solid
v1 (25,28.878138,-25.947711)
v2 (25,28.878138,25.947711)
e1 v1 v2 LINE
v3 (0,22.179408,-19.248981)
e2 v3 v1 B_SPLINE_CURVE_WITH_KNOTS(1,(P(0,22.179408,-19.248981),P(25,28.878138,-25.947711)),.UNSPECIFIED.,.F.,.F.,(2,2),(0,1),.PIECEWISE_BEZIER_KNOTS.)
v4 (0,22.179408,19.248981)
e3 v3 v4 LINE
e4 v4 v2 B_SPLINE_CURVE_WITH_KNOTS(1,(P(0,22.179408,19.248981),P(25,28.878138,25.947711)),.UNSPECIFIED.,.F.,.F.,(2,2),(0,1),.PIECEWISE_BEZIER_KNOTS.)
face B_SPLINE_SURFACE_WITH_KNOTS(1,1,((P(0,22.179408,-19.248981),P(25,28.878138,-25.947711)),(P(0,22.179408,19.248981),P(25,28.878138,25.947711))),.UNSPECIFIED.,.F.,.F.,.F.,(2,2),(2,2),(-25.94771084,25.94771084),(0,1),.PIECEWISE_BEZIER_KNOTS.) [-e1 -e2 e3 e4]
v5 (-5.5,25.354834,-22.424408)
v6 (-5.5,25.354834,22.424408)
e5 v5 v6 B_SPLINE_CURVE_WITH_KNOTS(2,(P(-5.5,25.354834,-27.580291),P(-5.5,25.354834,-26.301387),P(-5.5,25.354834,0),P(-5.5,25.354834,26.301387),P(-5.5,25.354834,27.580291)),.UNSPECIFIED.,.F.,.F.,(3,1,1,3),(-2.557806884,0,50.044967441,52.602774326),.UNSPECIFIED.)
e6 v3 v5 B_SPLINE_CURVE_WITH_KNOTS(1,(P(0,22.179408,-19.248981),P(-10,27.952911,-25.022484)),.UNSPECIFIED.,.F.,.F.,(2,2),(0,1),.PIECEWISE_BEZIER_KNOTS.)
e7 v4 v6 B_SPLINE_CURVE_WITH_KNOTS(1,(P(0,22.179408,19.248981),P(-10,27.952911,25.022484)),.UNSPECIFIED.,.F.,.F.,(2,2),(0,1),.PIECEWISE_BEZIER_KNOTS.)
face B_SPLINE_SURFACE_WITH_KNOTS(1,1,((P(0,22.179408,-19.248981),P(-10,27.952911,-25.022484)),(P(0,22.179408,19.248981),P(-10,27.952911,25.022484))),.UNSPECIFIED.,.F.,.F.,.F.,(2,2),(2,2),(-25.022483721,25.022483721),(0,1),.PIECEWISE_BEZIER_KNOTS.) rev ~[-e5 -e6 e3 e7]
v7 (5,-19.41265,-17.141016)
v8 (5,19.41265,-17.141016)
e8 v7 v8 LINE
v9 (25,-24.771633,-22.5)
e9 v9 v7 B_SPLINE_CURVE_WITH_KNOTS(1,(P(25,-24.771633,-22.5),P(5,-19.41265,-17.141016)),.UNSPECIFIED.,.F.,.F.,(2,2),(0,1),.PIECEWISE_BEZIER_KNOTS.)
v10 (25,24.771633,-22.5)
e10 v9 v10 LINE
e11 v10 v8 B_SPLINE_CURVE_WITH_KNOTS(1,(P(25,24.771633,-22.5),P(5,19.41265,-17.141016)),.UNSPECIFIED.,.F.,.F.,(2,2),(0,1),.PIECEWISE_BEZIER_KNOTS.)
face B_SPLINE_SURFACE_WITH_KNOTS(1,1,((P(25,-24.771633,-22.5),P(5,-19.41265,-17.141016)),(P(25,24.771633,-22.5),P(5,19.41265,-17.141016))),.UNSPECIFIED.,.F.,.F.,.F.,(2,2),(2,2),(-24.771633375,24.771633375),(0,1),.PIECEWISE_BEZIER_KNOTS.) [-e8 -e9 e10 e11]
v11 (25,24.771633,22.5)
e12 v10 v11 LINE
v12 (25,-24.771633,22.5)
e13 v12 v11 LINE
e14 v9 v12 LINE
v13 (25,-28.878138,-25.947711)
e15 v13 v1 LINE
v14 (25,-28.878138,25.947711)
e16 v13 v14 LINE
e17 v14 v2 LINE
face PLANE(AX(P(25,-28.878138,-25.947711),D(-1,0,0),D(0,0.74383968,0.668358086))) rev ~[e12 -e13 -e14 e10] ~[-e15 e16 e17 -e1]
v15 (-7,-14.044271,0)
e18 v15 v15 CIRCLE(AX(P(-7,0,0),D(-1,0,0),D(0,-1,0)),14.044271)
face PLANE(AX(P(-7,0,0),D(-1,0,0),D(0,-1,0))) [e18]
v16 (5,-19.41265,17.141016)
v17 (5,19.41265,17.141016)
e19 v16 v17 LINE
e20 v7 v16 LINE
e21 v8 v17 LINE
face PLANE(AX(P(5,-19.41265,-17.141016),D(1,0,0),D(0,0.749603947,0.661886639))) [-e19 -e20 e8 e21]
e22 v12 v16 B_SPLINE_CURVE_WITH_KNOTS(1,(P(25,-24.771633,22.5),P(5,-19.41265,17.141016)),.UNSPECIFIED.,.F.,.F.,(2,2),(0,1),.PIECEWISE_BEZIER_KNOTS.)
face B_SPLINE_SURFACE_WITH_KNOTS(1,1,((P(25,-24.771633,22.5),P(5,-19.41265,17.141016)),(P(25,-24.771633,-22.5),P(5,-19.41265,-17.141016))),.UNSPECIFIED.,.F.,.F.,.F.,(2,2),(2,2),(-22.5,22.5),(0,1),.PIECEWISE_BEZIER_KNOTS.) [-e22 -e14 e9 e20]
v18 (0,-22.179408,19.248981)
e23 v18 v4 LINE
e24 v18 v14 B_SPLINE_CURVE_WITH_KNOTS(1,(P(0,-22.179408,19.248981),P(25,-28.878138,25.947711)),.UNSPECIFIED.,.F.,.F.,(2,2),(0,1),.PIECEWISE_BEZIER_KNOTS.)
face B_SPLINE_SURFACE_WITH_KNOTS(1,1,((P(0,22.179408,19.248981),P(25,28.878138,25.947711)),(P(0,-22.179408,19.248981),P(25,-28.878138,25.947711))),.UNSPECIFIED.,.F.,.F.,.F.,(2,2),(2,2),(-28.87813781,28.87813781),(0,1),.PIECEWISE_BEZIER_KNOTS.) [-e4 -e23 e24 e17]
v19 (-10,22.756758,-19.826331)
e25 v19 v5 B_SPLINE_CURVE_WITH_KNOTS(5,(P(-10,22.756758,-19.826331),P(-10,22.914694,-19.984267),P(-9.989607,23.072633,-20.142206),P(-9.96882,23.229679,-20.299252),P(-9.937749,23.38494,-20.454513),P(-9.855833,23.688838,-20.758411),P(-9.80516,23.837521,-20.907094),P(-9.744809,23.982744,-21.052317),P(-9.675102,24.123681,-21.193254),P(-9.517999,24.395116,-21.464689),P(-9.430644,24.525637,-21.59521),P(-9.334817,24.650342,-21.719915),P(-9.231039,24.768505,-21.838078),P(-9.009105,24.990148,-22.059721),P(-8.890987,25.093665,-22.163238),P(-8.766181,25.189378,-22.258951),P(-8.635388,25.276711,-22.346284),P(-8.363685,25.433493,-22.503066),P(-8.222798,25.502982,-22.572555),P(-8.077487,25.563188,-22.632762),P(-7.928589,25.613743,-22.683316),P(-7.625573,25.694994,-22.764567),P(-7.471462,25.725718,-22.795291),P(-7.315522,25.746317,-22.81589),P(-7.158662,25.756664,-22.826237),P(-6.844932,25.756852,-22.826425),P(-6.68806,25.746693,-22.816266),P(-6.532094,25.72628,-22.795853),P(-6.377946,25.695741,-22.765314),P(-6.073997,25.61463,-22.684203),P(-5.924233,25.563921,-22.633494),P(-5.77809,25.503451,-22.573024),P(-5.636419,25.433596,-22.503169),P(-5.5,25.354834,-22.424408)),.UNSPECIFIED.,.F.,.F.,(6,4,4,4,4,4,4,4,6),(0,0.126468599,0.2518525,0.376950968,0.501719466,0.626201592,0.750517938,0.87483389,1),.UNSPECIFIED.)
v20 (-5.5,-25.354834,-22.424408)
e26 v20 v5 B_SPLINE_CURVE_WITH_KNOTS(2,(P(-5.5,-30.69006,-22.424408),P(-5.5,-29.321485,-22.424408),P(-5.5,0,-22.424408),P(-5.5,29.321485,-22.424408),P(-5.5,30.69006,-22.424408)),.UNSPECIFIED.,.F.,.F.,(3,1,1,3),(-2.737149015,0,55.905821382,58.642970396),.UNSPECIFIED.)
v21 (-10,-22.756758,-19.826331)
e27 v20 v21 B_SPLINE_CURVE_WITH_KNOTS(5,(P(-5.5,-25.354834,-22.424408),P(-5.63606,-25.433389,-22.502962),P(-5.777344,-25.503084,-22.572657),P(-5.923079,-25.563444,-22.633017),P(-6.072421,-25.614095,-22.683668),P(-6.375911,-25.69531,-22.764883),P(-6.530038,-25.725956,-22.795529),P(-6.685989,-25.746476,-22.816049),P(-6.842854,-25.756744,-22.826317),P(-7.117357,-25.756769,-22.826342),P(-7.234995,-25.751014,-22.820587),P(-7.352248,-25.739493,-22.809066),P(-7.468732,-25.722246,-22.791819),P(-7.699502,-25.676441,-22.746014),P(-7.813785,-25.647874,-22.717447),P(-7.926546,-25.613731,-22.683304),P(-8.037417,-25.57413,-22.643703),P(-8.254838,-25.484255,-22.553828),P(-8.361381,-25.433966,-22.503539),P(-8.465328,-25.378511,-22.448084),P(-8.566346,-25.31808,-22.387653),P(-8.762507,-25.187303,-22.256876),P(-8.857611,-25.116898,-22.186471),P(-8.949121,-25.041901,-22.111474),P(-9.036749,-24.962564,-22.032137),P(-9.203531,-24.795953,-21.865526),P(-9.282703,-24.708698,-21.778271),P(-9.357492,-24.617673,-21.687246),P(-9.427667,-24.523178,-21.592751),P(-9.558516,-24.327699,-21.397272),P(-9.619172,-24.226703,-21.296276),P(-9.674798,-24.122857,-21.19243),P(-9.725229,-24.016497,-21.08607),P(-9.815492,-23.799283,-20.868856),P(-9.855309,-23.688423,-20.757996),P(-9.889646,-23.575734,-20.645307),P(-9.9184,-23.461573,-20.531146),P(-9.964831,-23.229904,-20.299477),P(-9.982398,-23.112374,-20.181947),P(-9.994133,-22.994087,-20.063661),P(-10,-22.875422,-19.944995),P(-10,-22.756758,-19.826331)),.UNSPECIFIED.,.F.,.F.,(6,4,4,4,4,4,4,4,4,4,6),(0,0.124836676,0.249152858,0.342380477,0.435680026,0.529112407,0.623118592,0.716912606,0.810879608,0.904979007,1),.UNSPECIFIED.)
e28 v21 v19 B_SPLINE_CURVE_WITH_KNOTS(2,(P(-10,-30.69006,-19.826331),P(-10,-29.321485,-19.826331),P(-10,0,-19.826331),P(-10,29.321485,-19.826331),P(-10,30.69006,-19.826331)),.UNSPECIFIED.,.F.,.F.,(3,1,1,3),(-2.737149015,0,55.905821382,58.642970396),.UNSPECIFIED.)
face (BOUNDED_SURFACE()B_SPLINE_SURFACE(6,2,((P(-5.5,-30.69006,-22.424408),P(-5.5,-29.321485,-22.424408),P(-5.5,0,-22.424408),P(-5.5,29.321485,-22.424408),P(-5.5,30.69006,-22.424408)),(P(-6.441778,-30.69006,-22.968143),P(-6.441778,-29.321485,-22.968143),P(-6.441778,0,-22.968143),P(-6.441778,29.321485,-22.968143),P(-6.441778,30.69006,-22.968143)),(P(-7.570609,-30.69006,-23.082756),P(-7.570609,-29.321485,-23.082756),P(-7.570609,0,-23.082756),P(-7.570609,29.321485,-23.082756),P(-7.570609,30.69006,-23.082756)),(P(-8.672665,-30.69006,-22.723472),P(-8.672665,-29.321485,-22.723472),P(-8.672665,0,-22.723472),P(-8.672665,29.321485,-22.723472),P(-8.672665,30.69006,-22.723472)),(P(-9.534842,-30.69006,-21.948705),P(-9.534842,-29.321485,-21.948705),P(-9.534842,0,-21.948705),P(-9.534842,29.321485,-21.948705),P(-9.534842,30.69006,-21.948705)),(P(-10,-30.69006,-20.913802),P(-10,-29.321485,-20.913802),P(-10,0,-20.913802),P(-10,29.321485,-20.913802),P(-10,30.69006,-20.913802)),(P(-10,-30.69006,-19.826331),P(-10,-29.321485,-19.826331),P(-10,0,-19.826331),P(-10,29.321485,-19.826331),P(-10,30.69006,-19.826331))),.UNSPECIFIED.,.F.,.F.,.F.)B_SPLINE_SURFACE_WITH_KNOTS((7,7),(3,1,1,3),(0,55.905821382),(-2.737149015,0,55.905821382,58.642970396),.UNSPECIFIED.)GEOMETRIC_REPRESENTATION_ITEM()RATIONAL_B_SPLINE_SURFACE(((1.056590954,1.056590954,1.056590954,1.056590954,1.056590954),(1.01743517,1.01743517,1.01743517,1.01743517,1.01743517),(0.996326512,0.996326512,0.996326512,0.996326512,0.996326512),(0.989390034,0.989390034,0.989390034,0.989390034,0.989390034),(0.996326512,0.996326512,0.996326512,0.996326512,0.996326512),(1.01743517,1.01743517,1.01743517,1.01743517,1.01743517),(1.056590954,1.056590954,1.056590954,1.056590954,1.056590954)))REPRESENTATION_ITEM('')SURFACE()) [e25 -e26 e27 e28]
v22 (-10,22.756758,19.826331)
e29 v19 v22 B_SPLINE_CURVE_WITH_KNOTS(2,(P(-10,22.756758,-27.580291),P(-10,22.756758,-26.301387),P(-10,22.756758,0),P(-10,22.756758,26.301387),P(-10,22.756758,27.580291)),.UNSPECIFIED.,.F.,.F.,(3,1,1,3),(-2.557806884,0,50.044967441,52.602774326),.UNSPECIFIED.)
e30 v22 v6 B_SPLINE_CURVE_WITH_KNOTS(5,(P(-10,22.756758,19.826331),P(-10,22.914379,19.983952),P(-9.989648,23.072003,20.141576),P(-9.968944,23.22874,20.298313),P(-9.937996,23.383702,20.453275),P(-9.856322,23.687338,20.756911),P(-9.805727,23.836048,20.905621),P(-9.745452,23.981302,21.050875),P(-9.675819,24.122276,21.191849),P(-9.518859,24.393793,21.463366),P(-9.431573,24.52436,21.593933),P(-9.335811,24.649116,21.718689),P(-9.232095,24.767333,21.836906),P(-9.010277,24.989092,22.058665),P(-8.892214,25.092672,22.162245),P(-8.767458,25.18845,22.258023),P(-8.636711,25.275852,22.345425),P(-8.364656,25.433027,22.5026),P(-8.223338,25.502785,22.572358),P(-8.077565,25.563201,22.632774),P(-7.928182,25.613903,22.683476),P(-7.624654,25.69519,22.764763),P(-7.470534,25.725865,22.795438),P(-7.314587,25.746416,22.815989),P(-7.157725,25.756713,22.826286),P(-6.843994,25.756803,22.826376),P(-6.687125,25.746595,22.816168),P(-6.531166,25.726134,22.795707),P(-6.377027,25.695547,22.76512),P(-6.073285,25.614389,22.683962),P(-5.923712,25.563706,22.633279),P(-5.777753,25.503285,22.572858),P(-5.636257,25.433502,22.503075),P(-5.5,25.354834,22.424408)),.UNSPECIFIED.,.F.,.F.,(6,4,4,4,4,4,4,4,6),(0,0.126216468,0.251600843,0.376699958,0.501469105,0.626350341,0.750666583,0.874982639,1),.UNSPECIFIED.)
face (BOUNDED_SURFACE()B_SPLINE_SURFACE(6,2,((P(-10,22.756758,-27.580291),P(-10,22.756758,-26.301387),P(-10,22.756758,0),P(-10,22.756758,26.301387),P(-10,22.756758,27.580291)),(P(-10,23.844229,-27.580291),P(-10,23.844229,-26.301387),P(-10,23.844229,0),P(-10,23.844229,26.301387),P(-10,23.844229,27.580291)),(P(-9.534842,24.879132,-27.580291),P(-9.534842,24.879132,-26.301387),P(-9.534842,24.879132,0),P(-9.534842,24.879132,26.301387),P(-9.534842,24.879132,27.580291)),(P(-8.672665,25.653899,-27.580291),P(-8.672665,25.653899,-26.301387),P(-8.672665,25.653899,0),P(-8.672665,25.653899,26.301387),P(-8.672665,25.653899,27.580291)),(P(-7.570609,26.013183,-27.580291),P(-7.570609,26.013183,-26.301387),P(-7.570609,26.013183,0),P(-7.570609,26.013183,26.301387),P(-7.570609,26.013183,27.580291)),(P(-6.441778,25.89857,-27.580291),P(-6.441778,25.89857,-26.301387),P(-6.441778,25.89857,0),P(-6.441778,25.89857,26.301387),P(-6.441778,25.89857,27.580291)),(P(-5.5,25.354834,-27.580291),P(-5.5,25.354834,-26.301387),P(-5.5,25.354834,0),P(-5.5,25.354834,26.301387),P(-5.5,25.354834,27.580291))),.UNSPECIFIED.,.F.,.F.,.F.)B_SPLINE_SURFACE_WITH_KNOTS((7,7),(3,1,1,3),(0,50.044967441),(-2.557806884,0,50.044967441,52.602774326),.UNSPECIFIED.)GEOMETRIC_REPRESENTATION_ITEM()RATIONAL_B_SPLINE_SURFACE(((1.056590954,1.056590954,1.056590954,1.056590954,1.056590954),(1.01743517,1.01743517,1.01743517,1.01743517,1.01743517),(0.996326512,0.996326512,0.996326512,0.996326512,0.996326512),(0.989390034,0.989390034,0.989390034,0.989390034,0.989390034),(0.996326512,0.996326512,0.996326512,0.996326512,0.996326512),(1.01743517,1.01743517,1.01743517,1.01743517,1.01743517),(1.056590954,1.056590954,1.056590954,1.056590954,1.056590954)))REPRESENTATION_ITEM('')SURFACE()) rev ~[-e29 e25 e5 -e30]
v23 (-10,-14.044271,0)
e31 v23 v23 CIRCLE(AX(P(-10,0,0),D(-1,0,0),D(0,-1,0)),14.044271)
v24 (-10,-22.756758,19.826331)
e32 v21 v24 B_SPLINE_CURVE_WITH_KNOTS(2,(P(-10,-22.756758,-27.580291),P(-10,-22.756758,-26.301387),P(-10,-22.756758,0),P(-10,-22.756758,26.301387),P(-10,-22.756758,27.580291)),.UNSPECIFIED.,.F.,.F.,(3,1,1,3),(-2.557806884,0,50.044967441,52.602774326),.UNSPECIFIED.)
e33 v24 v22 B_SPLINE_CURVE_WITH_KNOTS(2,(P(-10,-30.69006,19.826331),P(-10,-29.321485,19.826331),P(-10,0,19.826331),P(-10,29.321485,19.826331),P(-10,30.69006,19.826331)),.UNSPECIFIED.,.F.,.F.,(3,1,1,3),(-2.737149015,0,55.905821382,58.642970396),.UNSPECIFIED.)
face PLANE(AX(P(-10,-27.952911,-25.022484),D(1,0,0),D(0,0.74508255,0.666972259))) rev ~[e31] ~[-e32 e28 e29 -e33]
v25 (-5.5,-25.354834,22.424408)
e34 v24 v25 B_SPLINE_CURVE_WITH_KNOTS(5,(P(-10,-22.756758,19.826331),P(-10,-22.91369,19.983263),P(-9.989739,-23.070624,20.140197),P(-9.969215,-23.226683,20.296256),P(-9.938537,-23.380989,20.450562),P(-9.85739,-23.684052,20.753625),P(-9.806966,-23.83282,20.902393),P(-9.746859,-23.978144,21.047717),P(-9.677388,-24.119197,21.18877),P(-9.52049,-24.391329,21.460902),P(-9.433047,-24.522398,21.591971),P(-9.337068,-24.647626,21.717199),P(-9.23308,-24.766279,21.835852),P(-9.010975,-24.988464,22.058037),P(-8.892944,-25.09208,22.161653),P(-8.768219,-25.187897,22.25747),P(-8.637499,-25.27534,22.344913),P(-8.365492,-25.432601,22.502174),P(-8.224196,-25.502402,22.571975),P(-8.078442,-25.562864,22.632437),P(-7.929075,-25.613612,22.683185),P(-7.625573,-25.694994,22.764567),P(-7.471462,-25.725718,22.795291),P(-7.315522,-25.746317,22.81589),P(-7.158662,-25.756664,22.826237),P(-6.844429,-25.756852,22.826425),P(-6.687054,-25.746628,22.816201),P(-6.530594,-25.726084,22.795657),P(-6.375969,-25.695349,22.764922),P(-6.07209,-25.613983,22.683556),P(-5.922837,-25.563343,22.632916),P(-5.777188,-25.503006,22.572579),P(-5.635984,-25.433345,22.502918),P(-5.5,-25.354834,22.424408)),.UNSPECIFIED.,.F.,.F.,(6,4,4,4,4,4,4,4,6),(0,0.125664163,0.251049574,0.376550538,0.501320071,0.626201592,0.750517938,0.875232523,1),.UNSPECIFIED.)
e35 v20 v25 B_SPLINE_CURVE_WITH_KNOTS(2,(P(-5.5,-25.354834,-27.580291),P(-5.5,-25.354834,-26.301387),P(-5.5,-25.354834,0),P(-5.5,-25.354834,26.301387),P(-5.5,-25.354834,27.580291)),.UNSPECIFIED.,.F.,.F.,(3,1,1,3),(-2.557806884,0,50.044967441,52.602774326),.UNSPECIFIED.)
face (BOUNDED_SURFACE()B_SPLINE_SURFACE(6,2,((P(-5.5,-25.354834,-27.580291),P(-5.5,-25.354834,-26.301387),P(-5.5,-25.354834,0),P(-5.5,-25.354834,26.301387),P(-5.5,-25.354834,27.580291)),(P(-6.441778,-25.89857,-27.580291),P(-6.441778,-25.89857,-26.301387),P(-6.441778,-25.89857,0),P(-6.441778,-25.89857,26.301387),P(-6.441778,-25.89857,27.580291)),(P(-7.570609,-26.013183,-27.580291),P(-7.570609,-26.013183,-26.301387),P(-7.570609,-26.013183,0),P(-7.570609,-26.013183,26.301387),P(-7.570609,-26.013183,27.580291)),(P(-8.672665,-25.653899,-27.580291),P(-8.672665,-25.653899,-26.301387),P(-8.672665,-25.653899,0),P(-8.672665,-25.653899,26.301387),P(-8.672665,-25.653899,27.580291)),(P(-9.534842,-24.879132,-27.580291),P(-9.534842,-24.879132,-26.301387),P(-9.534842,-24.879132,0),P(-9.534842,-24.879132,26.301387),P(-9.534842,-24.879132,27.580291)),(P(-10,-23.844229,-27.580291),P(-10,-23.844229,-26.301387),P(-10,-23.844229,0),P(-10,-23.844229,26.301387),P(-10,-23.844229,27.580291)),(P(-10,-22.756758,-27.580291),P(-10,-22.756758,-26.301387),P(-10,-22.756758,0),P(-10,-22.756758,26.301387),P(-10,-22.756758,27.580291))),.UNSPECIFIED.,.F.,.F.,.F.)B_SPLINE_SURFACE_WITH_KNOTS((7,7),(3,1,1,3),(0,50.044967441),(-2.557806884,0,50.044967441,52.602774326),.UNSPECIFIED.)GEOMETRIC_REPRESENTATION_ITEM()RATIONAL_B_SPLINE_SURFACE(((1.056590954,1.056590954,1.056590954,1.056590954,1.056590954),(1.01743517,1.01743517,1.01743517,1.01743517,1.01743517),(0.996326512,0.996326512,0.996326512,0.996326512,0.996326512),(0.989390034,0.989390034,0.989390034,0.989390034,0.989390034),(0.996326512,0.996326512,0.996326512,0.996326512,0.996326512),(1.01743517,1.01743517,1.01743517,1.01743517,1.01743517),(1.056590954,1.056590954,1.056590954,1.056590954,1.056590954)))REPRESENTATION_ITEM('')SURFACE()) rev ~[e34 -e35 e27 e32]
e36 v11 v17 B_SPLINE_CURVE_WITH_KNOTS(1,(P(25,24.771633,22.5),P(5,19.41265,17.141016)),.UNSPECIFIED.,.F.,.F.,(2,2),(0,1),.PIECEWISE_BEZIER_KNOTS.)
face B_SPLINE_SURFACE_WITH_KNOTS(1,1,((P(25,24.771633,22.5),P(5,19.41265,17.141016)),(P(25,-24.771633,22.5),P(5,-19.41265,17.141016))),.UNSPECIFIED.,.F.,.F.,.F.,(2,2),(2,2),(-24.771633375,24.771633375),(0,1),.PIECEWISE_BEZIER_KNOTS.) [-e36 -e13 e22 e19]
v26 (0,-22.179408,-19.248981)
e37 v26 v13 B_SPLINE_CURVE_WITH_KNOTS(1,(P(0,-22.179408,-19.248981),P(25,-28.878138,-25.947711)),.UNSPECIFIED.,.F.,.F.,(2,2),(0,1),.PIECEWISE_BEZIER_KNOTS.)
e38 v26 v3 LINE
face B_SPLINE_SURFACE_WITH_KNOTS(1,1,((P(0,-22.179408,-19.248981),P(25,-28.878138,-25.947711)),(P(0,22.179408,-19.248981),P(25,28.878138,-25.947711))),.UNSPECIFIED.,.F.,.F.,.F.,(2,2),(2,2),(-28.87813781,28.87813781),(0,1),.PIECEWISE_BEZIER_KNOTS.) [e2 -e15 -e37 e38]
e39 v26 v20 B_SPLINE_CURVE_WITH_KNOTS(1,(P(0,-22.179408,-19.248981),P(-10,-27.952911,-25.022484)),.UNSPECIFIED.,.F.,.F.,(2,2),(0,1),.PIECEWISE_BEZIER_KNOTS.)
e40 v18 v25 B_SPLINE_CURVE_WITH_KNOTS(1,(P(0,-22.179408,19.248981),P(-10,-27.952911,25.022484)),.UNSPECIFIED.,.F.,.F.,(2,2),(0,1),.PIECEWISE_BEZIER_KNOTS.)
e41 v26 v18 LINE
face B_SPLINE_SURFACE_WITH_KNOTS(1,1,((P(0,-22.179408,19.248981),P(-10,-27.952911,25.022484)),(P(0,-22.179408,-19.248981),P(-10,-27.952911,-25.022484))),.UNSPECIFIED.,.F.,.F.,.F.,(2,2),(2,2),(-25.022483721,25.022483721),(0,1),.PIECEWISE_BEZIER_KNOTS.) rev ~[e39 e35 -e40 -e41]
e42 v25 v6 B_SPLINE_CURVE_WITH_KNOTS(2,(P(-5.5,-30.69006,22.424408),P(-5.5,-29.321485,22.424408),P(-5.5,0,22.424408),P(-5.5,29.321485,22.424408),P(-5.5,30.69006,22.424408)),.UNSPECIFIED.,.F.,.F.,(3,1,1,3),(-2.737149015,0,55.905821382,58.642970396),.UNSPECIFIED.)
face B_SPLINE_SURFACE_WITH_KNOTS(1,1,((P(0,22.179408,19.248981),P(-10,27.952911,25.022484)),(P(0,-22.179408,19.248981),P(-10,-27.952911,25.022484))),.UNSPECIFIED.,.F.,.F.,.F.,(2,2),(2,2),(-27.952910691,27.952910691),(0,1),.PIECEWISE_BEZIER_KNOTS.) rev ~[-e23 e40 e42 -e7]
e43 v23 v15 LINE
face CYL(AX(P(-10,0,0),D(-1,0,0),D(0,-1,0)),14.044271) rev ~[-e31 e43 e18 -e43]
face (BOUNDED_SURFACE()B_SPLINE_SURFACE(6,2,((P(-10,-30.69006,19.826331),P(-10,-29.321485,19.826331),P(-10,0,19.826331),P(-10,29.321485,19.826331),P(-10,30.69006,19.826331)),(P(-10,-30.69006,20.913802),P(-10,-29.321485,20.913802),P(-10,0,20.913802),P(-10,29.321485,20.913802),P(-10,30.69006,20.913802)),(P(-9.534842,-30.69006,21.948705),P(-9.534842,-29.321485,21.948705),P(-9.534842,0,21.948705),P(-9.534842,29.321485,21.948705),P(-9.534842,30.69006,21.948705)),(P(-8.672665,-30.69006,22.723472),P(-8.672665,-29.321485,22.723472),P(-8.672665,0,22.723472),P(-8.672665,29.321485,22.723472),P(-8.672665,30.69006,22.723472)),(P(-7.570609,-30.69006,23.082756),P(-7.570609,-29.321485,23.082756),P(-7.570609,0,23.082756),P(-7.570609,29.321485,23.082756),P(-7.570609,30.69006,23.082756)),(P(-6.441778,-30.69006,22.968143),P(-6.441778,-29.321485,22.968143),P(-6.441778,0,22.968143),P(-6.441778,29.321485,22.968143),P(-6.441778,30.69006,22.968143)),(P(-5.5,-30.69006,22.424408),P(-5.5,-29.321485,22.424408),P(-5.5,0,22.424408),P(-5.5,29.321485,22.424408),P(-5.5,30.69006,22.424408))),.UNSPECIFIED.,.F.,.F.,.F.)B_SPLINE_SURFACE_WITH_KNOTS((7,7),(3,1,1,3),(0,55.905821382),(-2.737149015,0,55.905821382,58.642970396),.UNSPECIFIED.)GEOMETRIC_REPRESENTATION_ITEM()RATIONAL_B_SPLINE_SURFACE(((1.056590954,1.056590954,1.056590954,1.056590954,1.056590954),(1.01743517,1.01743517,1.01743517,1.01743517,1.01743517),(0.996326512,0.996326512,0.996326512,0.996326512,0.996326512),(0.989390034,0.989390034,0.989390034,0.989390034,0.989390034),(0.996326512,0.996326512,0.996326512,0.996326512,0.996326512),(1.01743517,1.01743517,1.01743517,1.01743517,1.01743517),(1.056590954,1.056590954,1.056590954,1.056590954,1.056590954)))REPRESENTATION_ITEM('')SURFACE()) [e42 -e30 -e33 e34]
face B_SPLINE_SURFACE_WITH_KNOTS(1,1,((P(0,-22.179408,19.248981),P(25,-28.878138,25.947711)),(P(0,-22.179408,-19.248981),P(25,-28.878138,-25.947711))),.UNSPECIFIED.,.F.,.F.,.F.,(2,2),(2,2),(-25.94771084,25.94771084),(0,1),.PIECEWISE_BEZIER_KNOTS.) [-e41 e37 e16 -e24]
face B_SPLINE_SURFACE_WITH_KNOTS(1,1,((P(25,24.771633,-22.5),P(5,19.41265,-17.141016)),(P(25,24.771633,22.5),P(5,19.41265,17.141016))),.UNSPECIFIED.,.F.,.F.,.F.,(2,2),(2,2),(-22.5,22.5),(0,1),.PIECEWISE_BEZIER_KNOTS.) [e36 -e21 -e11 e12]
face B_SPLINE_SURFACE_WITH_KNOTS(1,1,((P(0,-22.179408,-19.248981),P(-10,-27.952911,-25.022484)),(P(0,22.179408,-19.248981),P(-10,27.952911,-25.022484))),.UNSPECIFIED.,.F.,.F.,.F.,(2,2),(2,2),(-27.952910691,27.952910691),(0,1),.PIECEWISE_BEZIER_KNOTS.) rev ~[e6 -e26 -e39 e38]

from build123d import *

# Parameters (mm, degrees)
F0_W          = 44.3588159978
F0_H          = 38.4979620576
F1_DEPTH      = 25
F1_TAPER      = -15
F1_DEPTH_BACK = 10
F1_TAPER_BACK = -30
F2_W          = 49.5432667505
F2_H          = 45
F3_DEPTH      = 20
F3_TAPER      = 15
F4_R          = 3
F5_R          = 14.044270733
F6_DEPTH      = 3


with BuildPart() as f1:
    # F0 (on Right) → F1 (new body, two sides)
    with BuildSketch(Plane.YZ) as f1_sk:
        Rectangle(F0_W, F0_H)
    extrude(amount=F1_DEPTH, taper=F1_TAPER)
    extrude(f1_sk.sketch, amount=-F1_DEPTH_BACK, taper=F1_TAPER_BACK)

    # F2 (on face) → F3 (cut)
    with BuildSketch(Plane.YZ.offset(25)):
        Rectangle(F2_W, F2_H)
    extrude(amount=-F3_DEPTH, taper=F3_TAPER, mode=Mode.SUBTRACT)

    # F4
    f4_edges = [f1.edges().sort_by_distance(p)[0] for p in [
        (-10, 27.952911, 0),
        (-10, 0, 25.022484),
        (-10, -27.952911, 0),
        (-10, 0, -25.022484),
    ]]
    fillet(f4_edges, radius=F4_R)

    # F5 (on face) → F6 (cut)
    with BuildSketch(Plane(origin=(-10, 0, 0), x_dir=(0, -1, 0), z_dir=(-1, 0, 0))):
        Circle(F5_R)
    extrude(amount=-F6_DEPTH, mode=Mode.SUBTRACT)


solid = f1.part
